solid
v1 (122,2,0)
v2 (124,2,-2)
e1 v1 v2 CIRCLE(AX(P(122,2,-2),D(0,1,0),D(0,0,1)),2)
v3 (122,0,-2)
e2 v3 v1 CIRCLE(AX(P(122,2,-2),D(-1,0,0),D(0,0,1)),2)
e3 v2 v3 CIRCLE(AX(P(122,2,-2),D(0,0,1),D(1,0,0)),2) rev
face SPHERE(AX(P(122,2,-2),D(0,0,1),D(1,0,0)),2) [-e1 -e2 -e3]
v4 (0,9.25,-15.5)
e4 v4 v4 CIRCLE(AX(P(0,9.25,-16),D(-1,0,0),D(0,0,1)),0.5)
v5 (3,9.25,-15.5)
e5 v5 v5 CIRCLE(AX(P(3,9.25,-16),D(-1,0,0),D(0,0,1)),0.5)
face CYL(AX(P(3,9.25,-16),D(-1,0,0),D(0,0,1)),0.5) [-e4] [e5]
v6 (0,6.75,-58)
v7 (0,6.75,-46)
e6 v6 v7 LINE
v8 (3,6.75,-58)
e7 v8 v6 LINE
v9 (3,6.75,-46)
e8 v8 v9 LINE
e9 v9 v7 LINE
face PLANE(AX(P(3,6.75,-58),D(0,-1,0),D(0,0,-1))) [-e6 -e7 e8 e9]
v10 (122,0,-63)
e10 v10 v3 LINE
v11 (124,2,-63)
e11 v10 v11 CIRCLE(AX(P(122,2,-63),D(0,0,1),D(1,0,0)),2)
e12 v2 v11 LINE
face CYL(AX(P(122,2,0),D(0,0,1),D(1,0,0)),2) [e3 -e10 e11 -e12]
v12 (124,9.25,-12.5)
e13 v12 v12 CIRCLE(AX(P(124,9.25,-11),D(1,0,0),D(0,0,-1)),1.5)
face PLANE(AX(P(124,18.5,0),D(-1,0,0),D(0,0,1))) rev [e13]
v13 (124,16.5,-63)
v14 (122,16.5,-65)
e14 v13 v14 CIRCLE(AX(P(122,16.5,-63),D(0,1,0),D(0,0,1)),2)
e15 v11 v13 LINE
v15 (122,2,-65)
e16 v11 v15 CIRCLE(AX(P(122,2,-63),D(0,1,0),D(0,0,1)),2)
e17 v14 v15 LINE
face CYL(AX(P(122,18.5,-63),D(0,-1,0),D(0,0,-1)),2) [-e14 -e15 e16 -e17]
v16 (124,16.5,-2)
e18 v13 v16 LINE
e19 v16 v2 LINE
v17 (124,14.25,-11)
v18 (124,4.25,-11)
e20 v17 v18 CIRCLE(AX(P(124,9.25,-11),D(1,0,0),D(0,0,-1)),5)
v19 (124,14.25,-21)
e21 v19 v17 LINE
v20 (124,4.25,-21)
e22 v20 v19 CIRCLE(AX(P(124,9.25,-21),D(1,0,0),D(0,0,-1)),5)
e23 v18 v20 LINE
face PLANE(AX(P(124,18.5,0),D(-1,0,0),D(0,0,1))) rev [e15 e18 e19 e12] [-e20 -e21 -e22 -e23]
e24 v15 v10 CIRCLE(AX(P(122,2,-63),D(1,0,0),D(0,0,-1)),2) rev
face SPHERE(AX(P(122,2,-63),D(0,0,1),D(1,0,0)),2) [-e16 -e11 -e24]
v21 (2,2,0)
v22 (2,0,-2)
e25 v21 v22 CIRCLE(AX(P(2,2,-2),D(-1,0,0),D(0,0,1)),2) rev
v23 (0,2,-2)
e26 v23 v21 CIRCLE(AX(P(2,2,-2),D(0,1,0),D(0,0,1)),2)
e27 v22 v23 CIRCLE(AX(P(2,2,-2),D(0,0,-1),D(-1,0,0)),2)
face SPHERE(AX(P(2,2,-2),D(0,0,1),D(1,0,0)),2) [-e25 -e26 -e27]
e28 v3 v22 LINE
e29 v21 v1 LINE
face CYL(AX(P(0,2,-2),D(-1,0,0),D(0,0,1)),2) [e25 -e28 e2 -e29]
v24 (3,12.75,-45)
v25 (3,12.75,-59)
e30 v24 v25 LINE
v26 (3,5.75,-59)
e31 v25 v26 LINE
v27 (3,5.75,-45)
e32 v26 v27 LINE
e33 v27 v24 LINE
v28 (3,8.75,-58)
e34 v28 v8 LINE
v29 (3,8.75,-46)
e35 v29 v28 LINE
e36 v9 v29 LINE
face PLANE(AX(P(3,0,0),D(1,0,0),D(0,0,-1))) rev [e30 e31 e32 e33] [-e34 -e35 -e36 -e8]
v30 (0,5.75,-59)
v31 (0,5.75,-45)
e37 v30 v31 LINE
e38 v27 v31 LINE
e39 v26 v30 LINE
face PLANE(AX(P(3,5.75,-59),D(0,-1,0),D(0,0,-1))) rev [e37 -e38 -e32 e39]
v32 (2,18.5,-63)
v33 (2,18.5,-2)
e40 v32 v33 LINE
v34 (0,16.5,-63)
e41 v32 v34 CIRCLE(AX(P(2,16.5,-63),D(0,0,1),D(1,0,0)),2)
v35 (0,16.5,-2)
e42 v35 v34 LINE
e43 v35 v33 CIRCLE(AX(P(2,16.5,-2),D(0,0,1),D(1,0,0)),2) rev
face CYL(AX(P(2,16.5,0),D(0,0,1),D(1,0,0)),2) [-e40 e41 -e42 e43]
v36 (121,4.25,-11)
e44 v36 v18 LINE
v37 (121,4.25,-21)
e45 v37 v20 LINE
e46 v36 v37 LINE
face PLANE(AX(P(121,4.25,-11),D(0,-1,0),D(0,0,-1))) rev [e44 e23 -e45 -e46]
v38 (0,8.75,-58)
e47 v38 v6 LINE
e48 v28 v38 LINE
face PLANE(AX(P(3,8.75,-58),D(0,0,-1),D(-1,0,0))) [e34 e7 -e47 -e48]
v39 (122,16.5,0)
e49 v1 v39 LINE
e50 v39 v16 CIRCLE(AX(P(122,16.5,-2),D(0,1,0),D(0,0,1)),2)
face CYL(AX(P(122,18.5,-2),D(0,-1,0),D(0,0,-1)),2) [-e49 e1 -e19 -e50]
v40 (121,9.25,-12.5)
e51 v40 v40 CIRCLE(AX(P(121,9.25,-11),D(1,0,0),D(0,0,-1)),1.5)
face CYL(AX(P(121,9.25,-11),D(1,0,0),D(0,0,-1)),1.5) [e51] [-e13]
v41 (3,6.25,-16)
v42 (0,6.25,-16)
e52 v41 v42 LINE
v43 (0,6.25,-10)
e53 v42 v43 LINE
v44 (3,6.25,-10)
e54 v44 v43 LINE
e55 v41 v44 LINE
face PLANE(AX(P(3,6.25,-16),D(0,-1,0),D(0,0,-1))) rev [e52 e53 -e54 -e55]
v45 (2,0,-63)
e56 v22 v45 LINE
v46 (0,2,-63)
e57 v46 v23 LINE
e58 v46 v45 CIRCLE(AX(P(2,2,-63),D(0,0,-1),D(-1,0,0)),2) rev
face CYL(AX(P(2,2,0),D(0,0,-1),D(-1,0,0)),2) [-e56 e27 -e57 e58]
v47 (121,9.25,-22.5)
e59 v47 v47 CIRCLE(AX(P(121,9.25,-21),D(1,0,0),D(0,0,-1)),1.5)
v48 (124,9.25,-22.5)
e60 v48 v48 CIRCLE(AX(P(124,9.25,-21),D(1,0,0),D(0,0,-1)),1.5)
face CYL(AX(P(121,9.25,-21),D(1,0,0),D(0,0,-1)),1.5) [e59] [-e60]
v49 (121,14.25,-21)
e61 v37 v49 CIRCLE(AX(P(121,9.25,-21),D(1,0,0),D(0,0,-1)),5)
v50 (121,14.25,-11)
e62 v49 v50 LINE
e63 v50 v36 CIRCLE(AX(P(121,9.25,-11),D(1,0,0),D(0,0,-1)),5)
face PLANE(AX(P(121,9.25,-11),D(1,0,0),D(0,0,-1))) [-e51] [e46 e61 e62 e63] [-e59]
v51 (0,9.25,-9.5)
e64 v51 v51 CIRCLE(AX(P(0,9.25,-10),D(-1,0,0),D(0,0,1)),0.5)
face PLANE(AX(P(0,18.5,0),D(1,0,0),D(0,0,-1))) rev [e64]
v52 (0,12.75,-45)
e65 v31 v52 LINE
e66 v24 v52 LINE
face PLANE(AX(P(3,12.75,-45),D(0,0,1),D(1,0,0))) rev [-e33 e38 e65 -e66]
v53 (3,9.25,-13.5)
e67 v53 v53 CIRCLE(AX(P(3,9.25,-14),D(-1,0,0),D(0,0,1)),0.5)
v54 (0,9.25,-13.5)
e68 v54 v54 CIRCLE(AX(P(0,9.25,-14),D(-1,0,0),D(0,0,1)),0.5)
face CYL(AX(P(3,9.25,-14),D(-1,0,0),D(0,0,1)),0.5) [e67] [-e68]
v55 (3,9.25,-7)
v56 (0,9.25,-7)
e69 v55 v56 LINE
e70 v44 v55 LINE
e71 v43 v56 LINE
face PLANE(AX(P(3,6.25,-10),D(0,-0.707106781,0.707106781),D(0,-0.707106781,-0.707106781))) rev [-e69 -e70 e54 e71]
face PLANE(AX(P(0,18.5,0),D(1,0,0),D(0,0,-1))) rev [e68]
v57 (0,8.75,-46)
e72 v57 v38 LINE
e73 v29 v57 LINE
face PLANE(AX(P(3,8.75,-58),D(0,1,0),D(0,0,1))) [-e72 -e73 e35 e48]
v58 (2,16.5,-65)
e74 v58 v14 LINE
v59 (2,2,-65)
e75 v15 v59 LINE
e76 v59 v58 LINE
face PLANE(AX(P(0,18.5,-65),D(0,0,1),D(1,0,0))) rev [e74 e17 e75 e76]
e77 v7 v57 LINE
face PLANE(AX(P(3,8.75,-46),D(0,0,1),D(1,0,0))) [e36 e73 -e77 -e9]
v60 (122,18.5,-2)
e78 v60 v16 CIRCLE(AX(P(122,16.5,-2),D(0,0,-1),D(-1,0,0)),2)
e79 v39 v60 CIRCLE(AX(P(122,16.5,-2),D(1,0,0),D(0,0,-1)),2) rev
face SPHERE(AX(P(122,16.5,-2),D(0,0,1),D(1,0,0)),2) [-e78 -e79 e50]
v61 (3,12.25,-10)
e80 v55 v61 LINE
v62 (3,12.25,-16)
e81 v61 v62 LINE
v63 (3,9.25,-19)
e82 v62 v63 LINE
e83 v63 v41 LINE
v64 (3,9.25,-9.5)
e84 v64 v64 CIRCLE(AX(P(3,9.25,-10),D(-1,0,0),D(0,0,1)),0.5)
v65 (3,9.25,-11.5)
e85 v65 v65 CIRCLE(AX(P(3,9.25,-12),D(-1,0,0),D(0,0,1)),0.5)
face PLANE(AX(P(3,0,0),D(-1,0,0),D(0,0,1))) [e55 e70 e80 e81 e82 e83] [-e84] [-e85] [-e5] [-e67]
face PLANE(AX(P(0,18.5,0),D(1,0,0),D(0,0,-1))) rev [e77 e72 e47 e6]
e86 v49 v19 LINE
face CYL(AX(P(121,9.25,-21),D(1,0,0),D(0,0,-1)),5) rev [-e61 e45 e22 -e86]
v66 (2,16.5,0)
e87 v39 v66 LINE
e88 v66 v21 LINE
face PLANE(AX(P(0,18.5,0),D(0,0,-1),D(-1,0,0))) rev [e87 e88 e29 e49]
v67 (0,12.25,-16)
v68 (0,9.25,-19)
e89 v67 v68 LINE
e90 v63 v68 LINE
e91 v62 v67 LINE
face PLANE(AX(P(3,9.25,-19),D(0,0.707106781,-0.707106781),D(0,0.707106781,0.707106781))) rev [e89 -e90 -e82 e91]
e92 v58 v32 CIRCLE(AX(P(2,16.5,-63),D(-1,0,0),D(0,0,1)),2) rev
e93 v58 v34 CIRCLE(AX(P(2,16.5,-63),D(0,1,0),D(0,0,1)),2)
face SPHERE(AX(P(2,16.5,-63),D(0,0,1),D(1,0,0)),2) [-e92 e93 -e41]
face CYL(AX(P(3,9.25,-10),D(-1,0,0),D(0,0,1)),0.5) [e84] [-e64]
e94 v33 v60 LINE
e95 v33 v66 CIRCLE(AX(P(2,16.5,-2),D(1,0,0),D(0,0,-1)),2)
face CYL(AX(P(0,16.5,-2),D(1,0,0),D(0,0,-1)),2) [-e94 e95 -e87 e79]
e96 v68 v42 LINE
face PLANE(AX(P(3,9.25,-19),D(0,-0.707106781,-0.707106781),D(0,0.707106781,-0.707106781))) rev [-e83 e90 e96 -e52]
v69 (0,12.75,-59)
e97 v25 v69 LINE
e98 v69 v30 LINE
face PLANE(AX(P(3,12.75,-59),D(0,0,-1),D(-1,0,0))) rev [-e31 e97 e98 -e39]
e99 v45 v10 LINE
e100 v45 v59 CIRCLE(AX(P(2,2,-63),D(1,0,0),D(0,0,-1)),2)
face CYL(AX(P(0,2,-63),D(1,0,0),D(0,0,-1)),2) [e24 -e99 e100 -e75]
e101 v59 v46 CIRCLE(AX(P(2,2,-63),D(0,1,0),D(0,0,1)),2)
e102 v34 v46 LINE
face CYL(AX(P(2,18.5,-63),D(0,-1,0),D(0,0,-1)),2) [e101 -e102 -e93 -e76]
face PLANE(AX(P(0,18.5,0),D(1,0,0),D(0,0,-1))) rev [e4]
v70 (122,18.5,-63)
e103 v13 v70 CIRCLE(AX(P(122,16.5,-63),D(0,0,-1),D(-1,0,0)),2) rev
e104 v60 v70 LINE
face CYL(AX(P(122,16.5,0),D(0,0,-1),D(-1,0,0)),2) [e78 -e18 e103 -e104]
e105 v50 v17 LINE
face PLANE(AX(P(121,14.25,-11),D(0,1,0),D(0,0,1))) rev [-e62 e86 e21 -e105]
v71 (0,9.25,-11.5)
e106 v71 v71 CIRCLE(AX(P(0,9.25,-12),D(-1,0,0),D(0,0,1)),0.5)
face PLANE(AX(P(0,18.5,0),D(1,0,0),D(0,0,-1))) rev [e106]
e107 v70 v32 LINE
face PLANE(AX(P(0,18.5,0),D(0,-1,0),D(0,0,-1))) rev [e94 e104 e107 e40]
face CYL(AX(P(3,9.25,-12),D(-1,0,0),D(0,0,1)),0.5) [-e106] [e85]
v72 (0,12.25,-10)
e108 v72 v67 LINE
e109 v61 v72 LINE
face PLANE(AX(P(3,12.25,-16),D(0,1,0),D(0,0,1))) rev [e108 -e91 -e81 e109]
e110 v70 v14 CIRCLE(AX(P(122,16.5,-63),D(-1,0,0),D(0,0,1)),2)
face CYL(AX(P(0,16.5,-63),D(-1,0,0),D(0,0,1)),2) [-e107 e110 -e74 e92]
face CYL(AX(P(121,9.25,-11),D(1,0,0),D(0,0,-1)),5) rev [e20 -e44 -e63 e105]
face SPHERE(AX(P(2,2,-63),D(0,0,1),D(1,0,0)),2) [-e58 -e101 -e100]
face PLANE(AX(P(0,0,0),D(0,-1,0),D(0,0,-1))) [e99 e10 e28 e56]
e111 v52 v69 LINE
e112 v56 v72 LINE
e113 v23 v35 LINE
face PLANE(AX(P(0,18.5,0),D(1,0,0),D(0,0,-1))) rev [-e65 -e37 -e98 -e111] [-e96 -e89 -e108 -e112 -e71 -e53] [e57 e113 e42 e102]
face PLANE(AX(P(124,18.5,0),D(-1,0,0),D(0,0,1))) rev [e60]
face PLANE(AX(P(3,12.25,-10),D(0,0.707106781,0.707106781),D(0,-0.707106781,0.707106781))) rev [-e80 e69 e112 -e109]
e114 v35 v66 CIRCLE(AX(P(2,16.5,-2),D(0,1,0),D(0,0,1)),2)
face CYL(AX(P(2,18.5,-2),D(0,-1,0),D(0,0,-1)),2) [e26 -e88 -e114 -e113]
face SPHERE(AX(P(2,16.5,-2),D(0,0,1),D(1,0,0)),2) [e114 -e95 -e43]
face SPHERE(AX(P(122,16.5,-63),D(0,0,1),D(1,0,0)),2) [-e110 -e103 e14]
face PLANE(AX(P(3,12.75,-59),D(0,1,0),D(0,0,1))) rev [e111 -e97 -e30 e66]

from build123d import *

# Parameters (mm, degrees)
SKETCH_1_W          = 124
SKETCH_1_H          = 65
EXTRUDE_1_DEPTH     = 18.5
SKETCH_2_R          = 1.5
CUT_EXTRUDE_1_DEPTH = 3
SKETCH_3_W          = 14
SKETCH_3_H          = 7
SKETCH_3_W_2        = 12
SKETCH_3_H_2        = 2
CUT_EXTRUDE_2_DEPTH = 3
SKETCH_4_R          = 0.5
CUT_EXTRUDE_3_DEPTH = 3
FILLET_1_R          = 2
FILLET_2_R          = 2
FILLET_3_R          = 2
FILLET_4_R          = 2


with BuildPart() as part:
    # Эскиз1 → Бобышка-Вытянуть1 (new body)
    with BuildSketch(Plane(origin=(0, 0, 0), x_dir=(1, 0, 0), z_dir=(0, 1, 0))):
        with Locations((62, 32.5)):
            Rectangle(SKETCH_1_W, SKETCH_1_H)
    extrude(amount=EXTRUDE_1_DEPTH)

    # Эскиз2 → Вырез-Вытянуть1 (cut)
    with BuildSketch(Plane(origin=(124, 0, 0), x_dir=(0, 0, -1), z_dir=(1, 0, 0))):
        with BuildLine():
            Line((11, 14.25), (21, 14.25))
            ThreePointArc((21, 14.25), (26, 9.25), (21, 4.25))
            Line((21, 4.25), (11, 4.25))
            ThreePointArc((11, 4.25), (6, 9.25), (11, 14.25))
        make_face()
        with Locations((11, 9.25)):
            Circle(SKETCH_2_R, mode=Mode.SUBTRACT)
        with Locations((21, 9.25)):
            Circle(SKETCH_2_R, mode=Mode.SUBTRACT)
    extrude(amount=-CUT_EXTRUDE_1_DEPTH, mode=Mode.SUBTRACT)

    # Эскиз3 → Вырез-Вытянуть2 (cut)
    with BuildSketch(Plane.ZY):
        with Locations((-52, 9.25)):
            Rectangle(SKETCH_3_W, SKETCH_3_H)
        with Locations((-52, 7.75)):
            Rectangle(SKETCH_3_W_2, SKETCH_3_H_2, mode=Mode.SUBTRACT)
    extrude(amount=-CUT_EXTRUDE_2_DEPTH, mode=Mode.SUBTRACT)

    # Эскиз4 → Вырез-Вытянуть3 (cut)
    with BuildSketch(Plane.ZY):
        Polygon((-19, 9.25), (-16, 12.25), (-10, 12.25), (-7, 9.25), (-10, 6.25), (-16, 6.25), align=None)
        with Locations((-16, 9.25)):
            Circle(SKETCH_4_R, mode=Mode.SUBTRACT)
        with Locations((-14, 9.25)):
            Circle(SKETCH_4_R, mode=Mode.SUBTRACT)
        with Locations((-12, 9.25)):
            Circle(SKETCH_4_R, mode=Mode.SUBTRACT)
        with Locations((-10, 9.25)):
            Circle(SKETCH_4_R, mode=Mode.SUBTRACT)
    extrude(amount=-CUT_EXTRUDE_3_DEPTH, mode=Mode.SUBTRACT)

    # Скругление1
    fillet_1_edges = [part.edges().sort_by_distance(p)[0] for p in [
        (124, 18.5, -32.5),
        (62, 18.5, -65),
        (0, 18.5, -32.5),
        (62, 18.5, 0),
    ]]
    fillet(fillet_1_edges, radius=FILLET_1_R)

    # Скругление2
    fillet_2_edges = [part.edges().sort_by_distance(p)[0] for p in [
        (62, 0, -65),
        (124, 0, -32.5),
        (62, 0, 0),
        (0, 0, -32.5),
    ]]
    fillet(fillet_2_edges, radius=FILLET_2_R)

    # Скругление3
    # the kernel refuses this fillet: 2 mm, written as the material it takes off along each edge
    with BuildSketch(Plane(origin=(2, 16.5, -2), x_dir=(-1, 0, 0), z_dir=(0, 0, 1))) as fillet_3_piece_1_section:
        Polygon((0, 0), (FILLET_3_R, 0), (FILLET_3_R, -FILLET_3_R), (0, -FILLET_3_R), align=None)
    fillet_3_piece_1 = extrude(amount=FILLET_3_R, mode=Mode.PRIVATE)
    fillet_3_piece_1 = fillet_3_piece_1 - Plane(origin=(2, 16.5, -2), x_dir=(0.7071067811865475, -0.7071067811865475, 0), z_dir=(0, 0, 1)) * Sphere(FILLET_3_R, mode=Mode.PRIVATE)
    add(fillet_3_piece_1, mode=Mode.SUBTRACT)
    with BuildSketch(Plane(origin=(122, 16.5, -2), x_dir=(1, 0, 0), z_dir=(0, 0, 1))) as fillet_3_piece_2_section:
        Polygon((0, 0), (FILLET_3_R, 0), (FILLET_3_R, FILLET_3_R), (0, FILLET_3_R), align=None)
    fillet_3_piece_2 = extrude(amount=FILLET_3_R, mode=Mode.PRIVATE)
    fillet_3_piece_2 = fillet_3_piece_2 - Plane(origin=(122, 16.5, -2), x_dir=(-0.7071067811865475, -0.7071067811865475, 0), z_dir=(0, 0, 1)) * Sphere(FILLET_3_R, mode=Mode.PRIVATE)
    add(fillet_3_piece_2, mode=Mode.SUBTRACT)
    with BuildSketch(Plane(origin=(2, 2, -2), x_dir=(-1, 0, 0), z_dir=(0, 0, 1))) as fillet_3_piece_3_section:
        Polygon((0, 0), (FILLET_3_R, 0), (FILLET_3_R, FILLET_3_R), (0, FILLET_3_R), align=None)
    fillet_3_piece_3 = extrude(amount=FILLET_3_R, mode=Mode.PRIVATE)
    fillet_3_piece_3 = fillet_3_piece_3 - Plane(origin=(2, 2, -2), x_dir=(0.7071067811865475, 0.7071067811865475, 0), z_dir=(0, 0, 1)) * Sphere(FILLET_3_R, mode=Mode.PRIVATE)
    add(fillet_3_piece_3, mode=Mode.SUBTRACT)
    with BuildSketch(Plane(origin=(122, 2, -2), x_dir=(1, 0, 0), z_dir=(0, 0, 1))) as fillet_3_piece_4_section:
        Polygon((0, 0), (FILLET_3_R, 0), (FILLET_3_R, -FILLET_3_R), (0, -FILLET_3_R), align=None)
    fillet_3_piece_4 = extrude(amount=FILLET_3_R, mode=Mode.PRIVATE)
    fillet_3_piece_4 = fillet_3_piece_4 - Plane(origin=(122, 2, -2), x_dir=(-0.7071067811865475, 0.7071067811865475, 0), z_dir=(0, 0, 1)) * Sphere(FILLET_3_R, mode=Mode.PRIVATE)
    add(fillet_3_piece_4, mode=Mode.SUBTRACT)
    with BuildSketch(Plane(origin=(124, 2, 0), x_dir=(-1, 0, 0), z_dir=(0, 1, 0))) as fillet_3_piece_5:
        with BuildLine():
            CenterArc((FILLET_3_R, -FILLET_3_R), FILLET_3_R, 90, 90)
            Line((0, -FILLET_3_R), (0, 0))
            Line((0, 0), (FILLET_3_R, 0))
        make_face()
    extrude(amount=14.5, mode=Mode.SUBTRACT)
    with BuildSketch(Plane(origin=(0, 2, 0), x_dir=(1, 0, 0), z_dir=(0, 1, 0))) as fillet_3_piece_6:
        with BuildLine():
            CenterArc((FILLET_3_R, FILLET_3_R), FILLET_3_R, 180, 90)
            Line((0, FILLET_3_R), (0, 0))
            Line((0, 0), (FILLET_3_R, 0))
        make_face()
    extrude(amount=14.5, mode=Mode.SUBTRACT)

    # Скругление4
    # the kernel refuses this fillet: 2 mm, written as the material it takes off along each edge
    with BuildSketch(Plane(origin=(2, 16.5, -63), x_dir=(0, 0, -1), z_dir=(-1, 0, 0))) as fillet_4_piece_1_section:
        Polygon((0, 0), (FILLET_4_R, 0), (FILLET_4_R, -FILLET_4_R), (0, -FILLET_4_R), align=None)
    fillet_4_piece_1 = extrude(amount=FILLET_4_R, mode=Mode.PRIVATE)
    fillet_4_piece_1 = fillet_4_piece_1 - Plane(origin=(2, 16.5, -63), x_dir=(0, -0.7071067811865475, 0.7071067811865475), z_dir=(-1, 0, 0)) * Sphere(FILLET_4_R, mode=Mode.PRIVATE)
    add(fillet_4_piece_1, mode=Mode.SUBTRACT)
    with BuildSketch(Plane(origin=(122, 16.5, -63), x_dir=(0, 0, -1), z_dir=(1, 0, 0))) as fillet_4_piece_2_section:
        Polygon((0, 0), (FILLET_4_R, 0), (FILLET_4_R, FILLET_4_R), (0, FILLET_4_R), align=None)
    fillet_4_piece_2 = extrude(amount=FILLET_4_R, mode=Mode.PRIVATE)
    fillet_4_piece_2 = fillet_4_piece_2 - Plane(origin=(122, 16.5, -63), x_dir=(0, -0.7071067811865475, 0.7071067811865475), z_dir=(1, 0, 0)) * Sphere(FILLET_4_R, mode=Mode.PRIVATE)
    add(fillet_4_piece_2, mode=Mode.SUBTRACT)
    with BuildSketch(Plane(origin=(2, 2, -63), x_dir=(0, 0, -1), z_dir=(-1, 0, 0))) as fillet_4_piece_3_section:
        Polygon((0, 0), (FILLET_4_R, 0), (FILLET_4_R, FILLET_4_R), (0, FILLET_4_R), align=None)
    fillet_4_piece_3 = extrude(amount=FILLET_4_R, mode=Mode.PRIVATE)
    fillet_4_piece_3 = fillet_4_piece_3 - Plane(origin=(2, 2, -63), x_dir=(0, 0.7071067811865475, 0.7071067811865475), z_dir=(-1, 0, 0)) * Sphere(FILLET_4_R, mode=Mode.PRIVATE)
    add(fillet_4_piece_3, mode=Mode.SUBTRACT)
    with BuildSketch(Plane(origin=(122, 2, -63), x_dir=(0, 0, -1), z_dir=(1, 0, 0))) as fillet_4_piece_4_section:
        Polygon((0, 0), (FILLET_4_R, 0), (FILLET_4_R, -FILLET_4_R), (0, -FILLET_4_R), align=None)
    fillet_4_piece_4 = extrude(amount=FILLET_4_R, mode=Mode.PRIVATE)
    fillet_4_piece_4 = fillet_4_piece_4 - Plane(origin=(122, 2, -63), x_dir=(0, 0.7071067811865475, 0.7071067811865475), z_dir=(1, 0, 0)) * Sphere(FILLET_4_R, mode=Mode.PRIVATE)
    add(fillet_4_piece_4, mode=Mode.SUBTRACT)
    with BuildSketch(Plane(origin=(124, 2, -65), x_dir=(0, 0, 1), z_dir=(0, 1, 0))) as fillet_4_piece_5:
        with BuildLine():
            CenterArc((FILLET_4_R, -FILLET_4_R), FILLET_4_R, 90, 90)
            Line((0, -FILLET_4_R), (0, 0))
            Line((0, 0), (FILLET_4_R, 0))
        make_face()
    extrude(amount=14.5, mode=Mode.SUBTRACT)
    with BuildSketch(Plane(origin=(0, 2, -65), x_dir=(0, 0, 1), z_dir=(0, 1, 0))) as fillet_4_piece_6:
        with BuildLine():
            CenterArc((FILLET_4_R, FILLET_4_R), FILLET_4_R, 180, 90)
            Line((0, FILLET_4_R), (0, 0))
            Line((0, 0), (FILLET_4_R, 0))
        make_face()
    extrude(amount=14.5, mode=Mode.SUBTRACT)


solid = part.part
